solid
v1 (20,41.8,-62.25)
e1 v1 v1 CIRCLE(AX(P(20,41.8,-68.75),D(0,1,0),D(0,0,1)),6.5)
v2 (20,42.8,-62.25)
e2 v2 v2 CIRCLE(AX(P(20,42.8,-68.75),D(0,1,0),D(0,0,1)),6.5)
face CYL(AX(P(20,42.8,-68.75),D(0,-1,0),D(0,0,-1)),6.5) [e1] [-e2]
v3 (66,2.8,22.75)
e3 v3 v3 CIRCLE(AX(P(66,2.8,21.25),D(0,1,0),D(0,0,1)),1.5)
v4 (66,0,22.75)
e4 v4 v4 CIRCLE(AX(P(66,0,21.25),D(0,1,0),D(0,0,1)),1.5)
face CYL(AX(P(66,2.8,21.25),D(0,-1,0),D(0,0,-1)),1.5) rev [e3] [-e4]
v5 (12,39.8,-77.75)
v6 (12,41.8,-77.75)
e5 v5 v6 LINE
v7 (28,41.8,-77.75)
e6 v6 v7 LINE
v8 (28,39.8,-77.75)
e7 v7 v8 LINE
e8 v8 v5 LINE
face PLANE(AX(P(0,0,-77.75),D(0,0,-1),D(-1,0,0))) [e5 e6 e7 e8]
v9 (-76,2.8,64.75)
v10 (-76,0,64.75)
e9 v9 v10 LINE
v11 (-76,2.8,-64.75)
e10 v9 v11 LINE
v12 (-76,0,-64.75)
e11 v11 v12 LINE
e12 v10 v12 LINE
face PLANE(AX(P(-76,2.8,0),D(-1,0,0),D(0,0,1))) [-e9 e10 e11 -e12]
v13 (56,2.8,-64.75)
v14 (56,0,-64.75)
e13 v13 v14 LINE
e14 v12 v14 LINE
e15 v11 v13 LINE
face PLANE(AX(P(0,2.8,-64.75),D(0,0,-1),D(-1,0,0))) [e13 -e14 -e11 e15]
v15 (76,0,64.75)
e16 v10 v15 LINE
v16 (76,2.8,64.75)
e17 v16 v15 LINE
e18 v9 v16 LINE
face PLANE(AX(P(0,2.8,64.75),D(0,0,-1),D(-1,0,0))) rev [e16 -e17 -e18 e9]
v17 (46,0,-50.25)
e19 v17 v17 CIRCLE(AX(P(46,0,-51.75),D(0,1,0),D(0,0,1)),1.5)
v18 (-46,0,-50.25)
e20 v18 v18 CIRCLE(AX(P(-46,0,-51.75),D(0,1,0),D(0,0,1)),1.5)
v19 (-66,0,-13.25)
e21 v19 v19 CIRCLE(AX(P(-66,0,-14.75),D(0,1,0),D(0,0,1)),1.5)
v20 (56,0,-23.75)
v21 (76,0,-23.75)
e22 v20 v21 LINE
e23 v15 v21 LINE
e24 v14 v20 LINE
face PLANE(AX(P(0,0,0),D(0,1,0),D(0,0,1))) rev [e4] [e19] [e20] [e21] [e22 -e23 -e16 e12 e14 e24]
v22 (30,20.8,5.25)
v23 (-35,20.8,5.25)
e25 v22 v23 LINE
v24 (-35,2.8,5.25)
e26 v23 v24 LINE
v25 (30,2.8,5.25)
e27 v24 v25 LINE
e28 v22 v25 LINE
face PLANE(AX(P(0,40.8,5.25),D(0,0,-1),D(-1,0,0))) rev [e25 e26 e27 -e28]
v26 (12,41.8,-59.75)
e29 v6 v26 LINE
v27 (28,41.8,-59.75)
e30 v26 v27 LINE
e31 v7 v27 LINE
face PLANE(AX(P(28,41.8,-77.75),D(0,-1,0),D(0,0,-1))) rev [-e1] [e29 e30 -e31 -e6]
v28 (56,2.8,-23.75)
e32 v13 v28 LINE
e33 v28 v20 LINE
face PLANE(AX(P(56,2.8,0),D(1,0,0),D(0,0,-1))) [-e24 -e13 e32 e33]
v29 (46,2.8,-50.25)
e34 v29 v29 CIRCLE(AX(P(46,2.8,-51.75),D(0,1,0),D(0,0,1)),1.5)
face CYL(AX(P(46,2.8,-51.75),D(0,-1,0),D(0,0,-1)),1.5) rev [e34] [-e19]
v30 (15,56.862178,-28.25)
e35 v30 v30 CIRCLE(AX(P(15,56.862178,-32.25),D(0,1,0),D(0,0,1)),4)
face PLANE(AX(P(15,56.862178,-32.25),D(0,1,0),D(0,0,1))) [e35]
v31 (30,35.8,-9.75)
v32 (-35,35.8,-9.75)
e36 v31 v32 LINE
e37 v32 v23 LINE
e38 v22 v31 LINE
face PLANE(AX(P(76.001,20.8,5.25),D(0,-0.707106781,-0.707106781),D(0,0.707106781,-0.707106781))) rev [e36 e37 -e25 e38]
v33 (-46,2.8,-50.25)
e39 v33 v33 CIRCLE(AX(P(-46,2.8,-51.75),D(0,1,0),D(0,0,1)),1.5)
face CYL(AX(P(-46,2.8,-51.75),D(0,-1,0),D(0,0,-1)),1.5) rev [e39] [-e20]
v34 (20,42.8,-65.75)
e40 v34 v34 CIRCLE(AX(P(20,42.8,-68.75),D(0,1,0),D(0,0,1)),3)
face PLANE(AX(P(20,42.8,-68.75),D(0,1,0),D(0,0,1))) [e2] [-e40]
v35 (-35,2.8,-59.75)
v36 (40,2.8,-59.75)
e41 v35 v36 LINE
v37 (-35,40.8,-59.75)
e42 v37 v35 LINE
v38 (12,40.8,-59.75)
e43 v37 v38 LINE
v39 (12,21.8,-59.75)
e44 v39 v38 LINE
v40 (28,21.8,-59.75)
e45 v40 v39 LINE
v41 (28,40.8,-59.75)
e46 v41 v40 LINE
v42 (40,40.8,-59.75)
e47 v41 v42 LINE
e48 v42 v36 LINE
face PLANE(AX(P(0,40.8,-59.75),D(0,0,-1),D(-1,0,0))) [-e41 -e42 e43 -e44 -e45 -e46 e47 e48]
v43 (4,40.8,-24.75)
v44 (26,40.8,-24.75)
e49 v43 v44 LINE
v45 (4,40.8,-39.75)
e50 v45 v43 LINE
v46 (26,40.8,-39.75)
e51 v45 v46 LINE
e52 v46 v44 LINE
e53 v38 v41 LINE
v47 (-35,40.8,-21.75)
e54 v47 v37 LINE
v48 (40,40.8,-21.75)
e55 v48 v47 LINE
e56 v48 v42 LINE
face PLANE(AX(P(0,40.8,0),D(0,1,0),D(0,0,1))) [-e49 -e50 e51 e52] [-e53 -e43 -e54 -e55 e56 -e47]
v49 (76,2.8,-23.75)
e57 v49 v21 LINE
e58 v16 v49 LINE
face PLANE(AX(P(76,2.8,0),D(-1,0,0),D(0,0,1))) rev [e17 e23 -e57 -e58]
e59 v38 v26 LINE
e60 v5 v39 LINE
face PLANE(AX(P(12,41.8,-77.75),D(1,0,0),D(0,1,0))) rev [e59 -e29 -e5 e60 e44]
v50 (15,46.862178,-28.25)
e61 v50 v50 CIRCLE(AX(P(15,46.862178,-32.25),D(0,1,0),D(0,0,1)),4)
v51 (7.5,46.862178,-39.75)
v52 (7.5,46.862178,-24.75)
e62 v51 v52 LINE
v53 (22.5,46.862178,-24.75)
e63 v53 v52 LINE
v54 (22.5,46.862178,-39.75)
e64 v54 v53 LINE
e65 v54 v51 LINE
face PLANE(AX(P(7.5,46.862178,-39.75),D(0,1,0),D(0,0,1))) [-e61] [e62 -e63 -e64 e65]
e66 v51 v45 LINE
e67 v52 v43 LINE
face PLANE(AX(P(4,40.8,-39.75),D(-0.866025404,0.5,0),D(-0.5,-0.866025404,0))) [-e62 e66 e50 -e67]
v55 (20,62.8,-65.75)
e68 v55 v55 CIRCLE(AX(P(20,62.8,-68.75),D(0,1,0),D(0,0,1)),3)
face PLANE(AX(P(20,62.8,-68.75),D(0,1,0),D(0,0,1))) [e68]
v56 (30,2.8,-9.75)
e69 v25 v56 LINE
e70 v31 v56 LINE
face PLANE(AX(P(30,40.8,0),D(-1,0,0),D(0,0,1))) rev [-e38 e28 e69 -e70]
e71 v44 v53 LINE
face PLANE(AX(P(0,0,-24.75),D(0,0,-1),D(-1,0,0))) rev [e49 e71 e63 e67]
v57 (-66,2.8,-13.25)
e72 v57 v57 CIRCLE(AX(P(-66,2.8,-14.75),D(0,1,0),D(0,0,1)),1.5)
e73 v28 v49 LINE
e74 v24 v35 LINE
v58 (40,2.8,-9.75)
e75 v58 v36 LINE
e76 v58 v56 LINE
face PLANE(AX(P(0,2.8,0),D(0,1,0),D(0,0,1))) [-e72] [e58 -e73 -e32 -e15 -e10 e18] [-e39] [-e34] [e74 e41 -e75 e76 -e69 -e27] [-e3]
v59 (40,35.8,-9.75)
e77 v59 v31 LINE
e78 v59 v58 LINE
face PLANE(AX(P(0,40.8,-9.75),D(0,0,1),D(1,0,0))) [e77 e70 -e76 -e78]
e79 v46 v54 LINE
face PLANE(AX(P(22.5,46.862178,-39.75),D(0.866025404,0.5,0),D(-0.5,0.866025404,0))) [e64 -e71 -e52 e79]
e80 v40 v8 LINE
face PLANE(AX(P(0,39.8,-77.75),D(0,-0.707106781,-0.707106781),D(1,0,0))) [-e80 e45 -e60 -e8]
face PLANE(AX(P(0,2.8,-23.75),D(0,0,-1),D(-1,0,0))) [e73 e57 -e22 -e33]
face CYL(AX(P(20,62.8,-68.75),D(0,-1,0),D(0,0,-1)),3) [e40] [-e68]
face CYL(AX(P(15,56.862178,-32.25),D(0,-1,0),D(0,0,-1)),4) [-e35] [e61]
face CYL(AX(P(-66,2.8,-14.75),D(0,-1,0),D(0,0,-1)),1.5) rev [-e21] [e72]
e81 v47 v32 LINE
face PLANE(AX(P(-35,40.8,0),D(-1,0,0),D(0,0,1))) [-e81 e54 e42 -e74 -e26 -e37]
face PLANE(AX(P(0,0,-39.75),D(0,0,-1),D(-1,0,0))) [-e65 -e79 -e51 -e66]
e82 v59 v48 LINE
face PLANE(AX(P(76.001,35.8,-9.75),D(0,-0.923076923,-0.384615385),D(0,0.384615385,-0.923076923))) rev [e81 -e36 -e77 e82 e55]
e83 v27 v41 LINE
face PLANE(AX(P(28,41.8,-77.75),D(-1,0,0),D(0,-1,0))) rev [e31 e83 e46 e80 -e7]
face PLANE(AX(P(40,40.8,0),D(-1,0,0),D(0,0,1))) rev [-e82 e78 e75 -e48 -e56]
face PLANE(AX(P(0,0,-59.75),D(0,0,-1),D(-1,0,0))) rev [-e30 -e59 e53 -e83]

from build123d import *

# Parameters (mm, degrees)
SKETCH1_R           = 1.5
BOSS_EXTRUDE1_DEPTH = 2.8
BOSS_EXTRUDE2_DEPTH = 38
CUT_EXTRUDE1_REACH  = 136.827
SKETCH4_W           = 16
SKETCH4_H           = 20
BOSS_EXTRUDE3_DEPTH = 18
CHAMFER1_SIZE       = 18
SKETCH5_R           = 6.5
BOSS_EXTRUDE4_DEPTH = 1
SKETCH6_R           = 3
BOSS_EXTRUDE5_DEPTH = 20
BOSS_EXTRUDE6_DEPTH = 15
SKETCH8_R           = 4
BOSS_EXTRUDE7_DEPTH = 10


with BuildPart() as part:
    # Sketch1 → Boss-Extrude1 (new body)
    with BuildSketch(Plane(origin=(0, 0, 0), x_dir=(1, 0, 0), z_dir=(0, 1, 0))):
        Polygon((56, 23.75), (56, 64.75), (-76, 64.75), (-76, -64.75), (76, -64.75), (76, 23.75), align=None)
        with Locations(Location((66, -21.25, 0), (0, 0, 270))):
            Circle(SKETCH1_R, mode=Mode.SUBTRACT)
        with Locations(Location((-66, 14.75, 0), (0, 0, 270))):
            Circle(SKETCH1_R, mode=Mode.SUBTRACT)
        with Locations(Location((-46, 51.75, 0), (0, 0, 270))):
            Circle(SKETCH1_R, mode=Mode.SUBTRACT)
        with Locations(Location((46, 51.75, 0), (0, 0, 270))):
            Circle(SKETCH1_R, mode=Mode.SUBTRACT)
    extrude(amount=BOSS_EXTRUDE1_DEPTH)

    # Sketch2 → Boss-Extrude2 (add)
    with BuildSketch(Plane(origin=(0, 2.8, 0), x_dir=(1, 0, 0), z_dir=(0, 1, 0))):
        Polygon((-35, 59.75), (-35, -5.25), (30, -5.25), (30, 9.75), (40, 9.75), (40, 59.75), align=None)
    extrude(amount=BOSS_EXTRUDE2_DEPTH)

    # Sketch3 → Cut-Extrude1 (cut, up to next)
    with BuildSketch(Plane.ZY.offset(35), mode=Mode.PRIVATE) as cut_extrude1_sk1:
        Polygon((5.25, 20.8), (-9.75, 35.8), (-21.75, 40.8), (5.25, 40.8), align=None)
    cut_extrude1_tool1 = extrude(cut_extrude1_sk1.sketch, amount=-CUT_EXTRUDE1_REACH, mode=Mode.PRIVATE) & part.part
    add(cut_extrude1_tool1.solids().sort_by_distance((-35, 34.535632, -2.543103))[0], mode=Mode.SUBTRACT)

    # Sketch4 → Boss-Extrude3 (add)
    with BuildSketch(Plane(origin=(0, 0, -59.75), x_dir=(-1, 0, 0), z_dir=(0, 0, -1))):
        with Locations((-20, 31.8)):
            Rectangle(SKETCH4_W, SKETCH4_H)
    extrude(amount=BOSS_EXTRUDE3_DEPTH)

    # Chamfer1
    chamfer1_edges = [part.edges().sort_by_distance(p)[0] for p in [
        (20, 21.8, -77.75),
    ]]
    chamfer(chamfer1_edges, length=CHAMFER1_SIZE - 0.0001)  # a hair under: the kernel refuses the full size

    # Sketch5 → Boss-Extrude4 (add)
    with BuildSketch(Plane(origin=(0, 41.8, 0), x_dir=(1, 0, 0), z_dir=(0, 1, 0))):
        with Locations(Location((20, 68.75, 0), (0, 0, 270))):
            Circle(SKETCH5_R)
    extrude(amount=BOSS_EXTRUDE4_DEPTH)

    # Sketch6 → Boss-Extrude5 (add)
    with BuildSketch(Plane(origin=(0, 42.8, 0), x_dir=(1, 0, 0), z_dir=(0, 1, 0))):
        with Locations(Location((20, 68.75, 0), (0, 0, 270))):
            Circle(SKETCH6_R)
    extrude(amount=BOSS_EXTRUDE5_DEPTH)

    # Sketch7 → Boss-Extrude6 (add)
    with BuildSketch(Plane.XY.offset(-24.75)):
        Polygon((26, 40.8), (4, 40.8), (7.5, 46.862177826), (22.5, 46.862177826), align=None)
    extrude(amount=-BOSS_EXTRUDE6_DEPTH)

    # Sketch8 → Boss-Extrude7 (add)
    with BuildSketch(Plane(origin=(0, 46.862177826, 0), x_dir=(1, 0, 0), z_dir=(0, 1, 0))):
        with Locations(Location((15, 32.25, 0), (0, 0, 270))):
            Circle(SKETCH8_R)
    extrude(amount=BOSS_EXTRUDE7_DEPTH)


solid = part.part
